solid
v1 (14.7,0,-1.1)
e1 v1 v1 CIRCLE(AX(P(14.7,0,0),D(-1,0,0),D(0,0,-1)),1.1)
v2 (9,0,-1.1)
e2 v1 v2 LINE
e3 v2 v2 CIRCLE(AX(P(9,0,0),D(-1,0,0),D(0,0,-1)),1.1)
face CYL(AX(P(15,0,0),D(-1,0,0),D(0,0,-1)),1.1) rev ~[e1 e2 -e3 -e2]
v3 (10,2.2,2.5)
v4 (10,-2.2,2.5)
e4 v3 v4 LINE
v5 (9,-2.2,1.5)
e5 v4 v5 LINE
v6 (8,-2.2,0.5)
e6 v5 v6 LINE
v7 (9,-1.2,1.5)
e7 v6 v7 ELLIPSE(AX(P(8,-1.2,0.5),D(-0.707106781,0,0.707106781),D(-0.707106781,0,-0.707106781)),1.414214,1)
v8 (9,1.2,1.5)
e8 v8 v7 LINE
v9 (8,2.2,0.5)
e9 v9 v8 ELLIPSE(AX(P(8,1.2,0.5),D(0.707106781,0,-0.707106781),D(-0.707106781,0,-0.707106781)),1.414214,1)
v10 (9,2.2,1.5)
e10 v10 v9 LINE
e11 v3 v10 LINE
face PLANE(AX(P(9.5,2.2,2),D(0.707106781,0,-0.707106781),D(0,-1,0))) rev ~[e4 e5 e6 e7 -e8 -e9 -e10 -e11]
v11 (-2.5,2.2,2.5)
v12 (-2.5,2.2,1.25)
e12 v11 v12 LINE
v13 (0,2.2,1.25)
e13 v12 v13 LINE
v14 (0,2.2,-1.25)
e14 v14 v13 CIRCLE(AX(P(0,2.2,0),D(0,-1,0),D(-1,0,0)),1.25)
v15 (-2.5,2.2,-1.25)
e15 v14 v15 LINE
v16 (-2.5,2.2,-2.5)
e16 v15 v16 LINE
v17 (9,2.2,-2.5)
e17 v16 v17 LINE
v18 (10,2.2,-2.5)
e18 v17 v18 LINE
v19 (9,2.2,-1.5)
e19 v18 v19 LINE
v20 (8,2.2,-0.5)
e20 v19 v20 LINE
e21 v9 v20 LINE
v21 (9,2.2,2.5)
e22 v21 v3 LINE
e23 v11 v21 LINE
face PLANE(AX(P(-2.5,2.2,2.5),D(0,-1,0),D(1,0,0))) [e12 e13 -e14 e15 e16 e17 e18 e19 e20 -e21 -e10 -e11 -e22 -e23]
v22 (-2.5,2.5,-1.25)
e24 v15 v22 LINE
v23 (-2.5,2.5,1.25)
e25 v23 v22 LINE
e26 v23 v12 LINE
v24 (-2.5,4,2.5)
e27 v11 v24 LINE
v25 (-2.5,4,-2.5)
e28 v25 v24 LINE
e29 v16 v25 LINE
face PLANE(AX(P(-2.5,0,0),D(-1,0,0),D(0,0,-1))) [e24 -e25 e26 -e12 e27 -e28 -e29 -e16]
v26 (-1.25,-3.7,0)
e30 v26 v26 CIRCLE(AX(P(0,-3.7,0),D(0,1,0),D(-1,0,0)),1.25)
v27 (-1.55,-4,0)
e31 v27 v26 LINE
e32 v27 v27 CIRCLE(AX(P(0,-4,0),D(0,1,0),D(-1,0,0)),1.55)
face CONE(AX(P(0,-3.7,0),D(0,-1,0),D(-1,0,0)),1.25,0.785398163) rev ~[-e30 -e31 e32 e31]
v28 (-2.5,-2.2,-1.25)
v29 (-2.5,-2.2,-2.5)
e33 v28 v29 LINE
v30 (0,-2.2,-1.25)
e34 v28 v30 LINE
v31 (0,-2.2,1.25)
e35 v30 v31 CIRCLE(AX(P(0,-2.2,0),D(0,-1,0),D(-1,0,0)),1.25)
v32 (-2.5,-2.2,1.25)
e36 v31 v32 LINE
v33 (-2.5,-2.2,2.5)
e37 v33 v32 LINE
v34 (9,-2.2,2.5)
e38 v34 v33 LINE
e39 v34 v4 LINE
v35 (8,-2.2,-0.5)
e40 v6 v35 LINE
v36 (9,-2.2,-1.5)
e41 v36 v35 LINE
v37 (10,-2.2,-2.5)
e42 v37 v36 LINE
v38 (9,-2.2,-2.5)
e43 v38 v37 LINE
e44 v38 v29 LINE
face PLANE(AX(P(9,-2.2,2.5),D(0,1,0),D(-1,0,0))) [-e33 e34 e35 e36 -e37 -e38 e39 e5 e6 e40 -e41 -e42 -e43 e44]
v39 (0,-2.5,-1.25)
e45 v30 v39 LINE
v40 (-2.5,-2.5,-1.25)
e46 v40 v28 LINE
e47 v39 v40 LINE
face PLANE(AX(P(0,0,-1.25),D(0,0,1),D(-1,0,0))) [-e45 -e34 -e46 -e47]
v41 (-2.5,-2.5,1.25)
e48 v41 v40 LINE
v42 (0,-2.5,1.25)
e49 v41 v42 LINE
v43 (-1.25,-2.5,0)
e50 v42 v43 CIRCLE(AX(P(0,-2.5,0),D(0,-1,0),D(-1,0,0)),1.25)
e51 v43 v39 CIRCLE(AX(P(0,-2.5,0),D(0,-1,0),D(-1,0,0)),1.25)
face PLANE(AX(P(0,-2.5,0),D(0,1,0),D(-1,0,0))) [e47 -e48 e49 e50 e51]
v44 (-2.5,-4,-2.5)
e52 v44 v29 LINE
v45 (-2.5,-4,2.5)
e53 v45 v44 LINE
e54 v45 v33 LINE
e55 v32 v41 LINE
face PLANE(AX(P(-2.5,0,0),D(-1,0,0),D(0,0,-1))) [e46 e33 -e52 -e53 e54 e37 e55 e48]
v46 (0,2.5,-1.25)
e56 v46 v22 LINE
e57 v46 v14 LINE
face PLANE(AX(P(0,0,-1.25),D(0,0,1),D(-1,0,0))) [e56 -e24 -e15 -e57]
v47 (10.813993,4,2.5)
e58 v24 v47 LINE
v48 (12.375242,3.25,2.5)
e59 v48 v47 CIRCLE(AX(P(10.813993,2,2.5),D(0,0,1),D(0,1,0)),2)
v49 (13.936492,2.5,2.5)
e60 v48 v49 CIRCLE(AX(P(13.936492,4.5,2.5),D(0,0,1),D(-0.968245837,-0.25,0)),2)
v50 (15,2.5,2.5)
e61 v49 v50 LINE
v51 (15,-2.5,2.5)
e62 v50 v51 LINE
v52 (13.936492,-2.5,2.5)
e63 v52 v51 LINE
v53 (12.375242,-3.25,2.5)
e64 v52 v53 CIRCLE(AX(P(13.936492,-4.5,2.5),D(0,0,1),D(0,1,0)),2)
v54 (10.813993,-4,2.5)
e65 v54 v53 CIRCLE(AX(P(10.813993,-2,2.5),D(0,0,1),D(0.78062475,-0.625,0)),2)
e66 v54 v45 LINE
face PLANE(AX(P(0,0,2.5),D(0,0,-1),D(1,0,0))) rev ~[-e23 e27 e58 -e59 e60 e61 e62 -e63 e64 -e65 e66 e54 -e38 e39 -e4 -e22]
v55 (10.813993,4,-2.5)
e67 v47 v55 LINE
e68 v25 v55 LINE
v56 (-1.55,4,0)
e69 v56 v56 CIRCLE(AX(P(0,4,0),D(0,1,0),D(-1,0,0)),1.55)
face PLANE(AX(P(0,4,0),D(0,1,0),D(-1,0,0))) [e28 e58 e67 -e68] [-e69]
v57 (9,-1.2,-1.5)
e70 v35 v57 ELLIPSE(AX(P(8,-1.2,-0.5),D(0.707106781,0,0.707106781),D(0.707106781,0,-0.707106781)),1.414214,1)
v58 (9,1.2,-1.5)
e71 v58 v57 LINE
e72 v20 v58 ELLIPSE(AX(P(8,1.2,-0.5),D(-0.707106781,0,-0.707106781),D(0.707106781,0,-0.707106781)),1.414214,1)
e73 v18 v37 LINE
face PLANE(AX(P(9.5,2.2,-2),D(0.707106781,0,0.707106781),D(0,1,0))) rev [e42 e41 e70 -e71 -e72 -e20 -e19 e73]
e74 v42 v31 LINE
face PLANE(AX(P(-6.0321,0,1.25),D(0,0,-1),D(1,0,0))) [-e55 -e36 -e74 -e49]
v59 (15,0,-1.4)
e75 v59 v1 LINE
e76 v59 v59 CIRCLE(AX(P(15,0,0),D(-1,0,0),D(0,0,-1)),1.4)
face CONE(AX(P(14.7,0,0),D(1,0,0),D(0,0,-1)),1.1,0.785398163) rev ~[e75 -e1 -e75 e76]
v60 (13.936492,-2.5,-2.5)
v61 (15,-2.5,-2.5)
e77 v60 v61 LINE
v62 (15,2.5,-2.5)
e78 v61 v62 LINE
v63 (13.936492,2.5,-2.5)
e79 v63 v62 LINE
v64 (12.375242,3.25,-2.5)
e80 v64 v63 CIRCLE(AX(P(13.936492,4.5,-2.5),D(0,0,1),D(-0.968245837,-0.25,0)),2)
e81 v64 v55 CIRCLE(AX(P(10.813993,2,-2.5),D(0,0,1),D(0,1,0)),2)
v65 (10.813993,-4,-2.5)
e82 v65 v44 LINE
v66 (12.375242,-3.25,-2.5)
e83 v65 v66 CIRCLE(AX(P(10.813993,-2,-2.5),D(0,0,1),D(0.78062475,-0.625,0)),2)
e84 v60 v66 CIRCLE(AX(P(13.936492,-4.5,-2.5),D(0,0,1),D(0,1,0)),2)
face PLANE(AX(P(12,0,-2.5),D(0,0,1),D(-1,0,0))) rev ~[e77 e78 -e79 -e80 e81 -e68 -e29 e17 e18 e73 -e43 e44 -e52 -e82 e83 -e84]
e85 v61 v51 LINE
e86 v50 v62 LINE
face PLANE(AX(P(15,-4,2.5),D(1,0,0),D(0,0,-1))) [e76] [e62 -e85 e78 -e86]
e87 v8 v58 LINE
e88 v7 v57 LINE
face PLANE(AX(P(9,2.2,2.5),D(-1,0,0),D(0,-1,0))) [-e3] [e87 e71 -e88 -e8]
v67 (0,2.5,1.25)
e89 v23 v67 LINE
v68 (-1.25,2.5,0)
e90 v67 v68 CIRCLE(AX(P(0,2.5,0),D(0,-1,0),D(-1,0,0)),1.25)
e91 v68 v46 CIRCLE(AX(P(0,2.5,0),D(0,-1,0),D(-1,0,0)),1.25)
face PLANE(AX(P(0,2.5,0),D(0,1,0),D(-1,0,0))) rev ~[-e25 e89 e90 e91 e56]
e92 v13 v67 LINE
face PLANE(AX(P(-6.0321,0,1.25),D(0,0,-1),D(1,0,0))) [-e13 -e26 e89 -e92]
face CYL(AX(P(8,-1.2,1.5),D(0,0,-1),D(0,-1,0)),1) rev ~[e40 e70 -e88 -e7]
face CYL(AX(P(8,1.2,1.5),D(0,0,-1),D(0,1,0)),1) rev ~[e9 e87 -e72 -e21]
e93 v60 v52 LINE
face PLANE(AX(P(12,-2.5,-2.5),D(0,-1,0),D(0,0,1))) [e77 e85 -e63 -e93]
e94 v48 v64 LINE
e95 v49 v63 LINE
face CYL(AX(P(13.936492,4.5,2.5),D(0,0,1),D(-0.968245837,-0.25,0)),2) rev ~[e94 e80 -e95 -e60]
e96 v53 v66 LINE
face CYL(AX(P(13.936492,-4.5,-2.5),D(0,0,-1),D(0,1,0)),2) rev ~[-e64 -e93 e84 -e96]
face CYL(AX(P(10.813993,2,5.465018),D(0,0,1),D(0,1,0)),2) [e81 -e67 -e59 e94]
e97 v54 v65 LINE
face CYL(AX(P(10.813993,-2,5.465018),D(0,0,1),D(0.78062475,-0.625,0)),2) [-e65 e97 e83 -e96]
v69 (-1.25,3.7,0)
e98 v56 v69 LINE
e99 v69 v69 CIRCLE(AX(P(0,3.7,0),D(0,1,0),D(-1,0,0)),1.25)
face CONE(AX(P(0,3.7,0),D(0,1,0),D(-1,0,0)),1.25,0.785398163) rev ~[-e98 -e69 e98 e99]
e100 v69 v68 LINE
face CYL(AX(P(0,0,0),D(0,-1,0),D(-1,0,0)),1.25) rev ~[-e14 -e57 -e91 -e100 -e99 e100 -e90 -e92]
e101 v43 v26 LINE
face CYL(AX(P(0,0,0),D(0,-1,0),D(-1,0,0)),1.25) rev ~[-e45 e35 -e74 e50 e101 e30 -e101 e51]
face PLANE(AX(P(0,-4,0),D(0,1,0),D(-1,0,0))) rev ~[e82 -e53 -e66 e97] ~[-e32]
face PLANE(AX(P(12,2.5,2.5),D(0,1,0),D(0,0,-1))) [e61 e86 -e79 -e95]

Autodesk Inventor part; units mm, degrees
ref_plane "YZ Plane" through (0, 0, 0) normal (1, 0, 0) x (0, 1, 0)
ref_plane "XZ Plane" through (0, 0, 0) normal (0, 1, 0) x (-1, 0, 0)
ref_plane "XY Plane" through (0, 0, 0) normal (0, 0, 1) x (1, 0, 0)
sketch "スケッチ1" plane through (0, 0, 0) normal (0, 1, 0) x (-1, 0, 0)
  line L0 (0, 2.5) -> (-12, 2.5)
  line L1 (-12, 2.5) -> (-12, -2.5)
  line L2 (-12, -2.5) -> (0, -2.5)
  arc A0 (0, -2.5) -> (0, 2.5) centre (0, 0) ccw
  circle A1 centre (0, 0) radius 1.25
  line L3 (0, 2.5) -> (2.5, 2.5)
  line L4 (2.5, 2.5) -> (2.5, -2.5)
  line L5 (2.5, -2.5) -> (0, -2.5)
  point P0 (2.5, 0)
  dimension "d0" = 2.5
  dimension "d1" = 2.5
  dimension "d2" = 12
extrude "押し出し1" add sketch "スケッチ1" along normal mid plane 8
sketch "スケッチ7" plane through (-2.5, 4, 2.5) normal (0, 0, 1) x (1, 0, 0)
  line L0 (14.5, 0) -> (14.5, -8) projected
  line L1 (0, -8) -> (0, 0) projected
  line L2 (0, -8) -> (0, 0) projected
  line L3 (0, -1.8) -> (11.5, -1.8)
  line L4 (11.5, -1.8) -> (11.5, -6.2)
  line L5 (11.5, -6.2) -> (0, -6.2)
  line L6 (0, -6.2) -> (0, -1.8)
  line L7 (0, 0) -> (14.5, 0) projected
  point P0 (2.5, -4)
  point P1 (0, -4)
  point P2 (0, -1.8)
  point P3 (0, -6.2)
  dimension "d32" = 3
  dimension "d46" = 4.4
  dimension "d47" = 1.8
extrude "押し出し5" cut sketch "スケッチ7" against normal through all
sketch "スケッチ3" plane through (12, -4, 2.5) normal (1, 0, 0) x (0, 0, -1)
  line L0 (5, 0) -> (5, 8) projected
  line L1 (0, 8) -> (0, 0) projected
  line L2 (0, 6.5) -> (5, 6.5)
  line L3 (5, 6.5) -> (5, 1.5)
  line L4 (5, 1.5) -> (0, 1.5)
  line L5 (0, 1.5) -> (0, 6.5)
  point P0 (2.5, 4)
  point P1 (0, 4)
  point P2 (0, 4)
  point P3 (0, 6.5)
extrude "押し出し3" add sketch "スケッチ3" along normal blind 3
sketch "スケッチ5" plane through (0, 0, 0) normal (0, 1, 0) x (-1, 0, 0)
  line L0 (6.0321, 1.25) -> (0, 1.25)
  line L1 (0, 1.25) -> (0, -1.25)
  line L2 (0, -1.25) -> (6.0321, -1.25)
  line L3 (6.0321, -1.25) -> (6.0321, 1.25)
  circle A0 centre (0, 0) radius 1.25 projected
extrude "押し出し4" cut sketch "スケッチ5" along normal mid plane 5 contours L3 L2 A0 L0 | A0 L1 picked at (0.2598, 0.3258)
sketch "スケッチ8" plane through (15, -4, 2.5) normal (1, 0, 0) x (0, 0, -1)
  point P0 (2.5, 4)
  point P1 (2.5, 4)
hole "穴3" at (15, 0, 0) direction (-1, 0, 0) diameter 2.2 end through all
fillet "フィレット2" radius 2 4 edges at (12, 4, 0) (12, -4, 0) (12, -2.5, 0) (12, 2.5, 0)
chamfer "面取り1" distance 0.3 angle 45 3 edges at (1.25, 4, 0) (1.25, -4, 0) (15, 0, 1.1)
chamfer "面取り2" distance 1 angle 45 2 edges at (9, 0, 2.5) (9, 0, -2.5)
fillet "フィレット4" radius 1 2 edges at (9, 2.2, 0) (9, -2.2, 0)
properties part number "gear_1" material "ABS プラスチック"
